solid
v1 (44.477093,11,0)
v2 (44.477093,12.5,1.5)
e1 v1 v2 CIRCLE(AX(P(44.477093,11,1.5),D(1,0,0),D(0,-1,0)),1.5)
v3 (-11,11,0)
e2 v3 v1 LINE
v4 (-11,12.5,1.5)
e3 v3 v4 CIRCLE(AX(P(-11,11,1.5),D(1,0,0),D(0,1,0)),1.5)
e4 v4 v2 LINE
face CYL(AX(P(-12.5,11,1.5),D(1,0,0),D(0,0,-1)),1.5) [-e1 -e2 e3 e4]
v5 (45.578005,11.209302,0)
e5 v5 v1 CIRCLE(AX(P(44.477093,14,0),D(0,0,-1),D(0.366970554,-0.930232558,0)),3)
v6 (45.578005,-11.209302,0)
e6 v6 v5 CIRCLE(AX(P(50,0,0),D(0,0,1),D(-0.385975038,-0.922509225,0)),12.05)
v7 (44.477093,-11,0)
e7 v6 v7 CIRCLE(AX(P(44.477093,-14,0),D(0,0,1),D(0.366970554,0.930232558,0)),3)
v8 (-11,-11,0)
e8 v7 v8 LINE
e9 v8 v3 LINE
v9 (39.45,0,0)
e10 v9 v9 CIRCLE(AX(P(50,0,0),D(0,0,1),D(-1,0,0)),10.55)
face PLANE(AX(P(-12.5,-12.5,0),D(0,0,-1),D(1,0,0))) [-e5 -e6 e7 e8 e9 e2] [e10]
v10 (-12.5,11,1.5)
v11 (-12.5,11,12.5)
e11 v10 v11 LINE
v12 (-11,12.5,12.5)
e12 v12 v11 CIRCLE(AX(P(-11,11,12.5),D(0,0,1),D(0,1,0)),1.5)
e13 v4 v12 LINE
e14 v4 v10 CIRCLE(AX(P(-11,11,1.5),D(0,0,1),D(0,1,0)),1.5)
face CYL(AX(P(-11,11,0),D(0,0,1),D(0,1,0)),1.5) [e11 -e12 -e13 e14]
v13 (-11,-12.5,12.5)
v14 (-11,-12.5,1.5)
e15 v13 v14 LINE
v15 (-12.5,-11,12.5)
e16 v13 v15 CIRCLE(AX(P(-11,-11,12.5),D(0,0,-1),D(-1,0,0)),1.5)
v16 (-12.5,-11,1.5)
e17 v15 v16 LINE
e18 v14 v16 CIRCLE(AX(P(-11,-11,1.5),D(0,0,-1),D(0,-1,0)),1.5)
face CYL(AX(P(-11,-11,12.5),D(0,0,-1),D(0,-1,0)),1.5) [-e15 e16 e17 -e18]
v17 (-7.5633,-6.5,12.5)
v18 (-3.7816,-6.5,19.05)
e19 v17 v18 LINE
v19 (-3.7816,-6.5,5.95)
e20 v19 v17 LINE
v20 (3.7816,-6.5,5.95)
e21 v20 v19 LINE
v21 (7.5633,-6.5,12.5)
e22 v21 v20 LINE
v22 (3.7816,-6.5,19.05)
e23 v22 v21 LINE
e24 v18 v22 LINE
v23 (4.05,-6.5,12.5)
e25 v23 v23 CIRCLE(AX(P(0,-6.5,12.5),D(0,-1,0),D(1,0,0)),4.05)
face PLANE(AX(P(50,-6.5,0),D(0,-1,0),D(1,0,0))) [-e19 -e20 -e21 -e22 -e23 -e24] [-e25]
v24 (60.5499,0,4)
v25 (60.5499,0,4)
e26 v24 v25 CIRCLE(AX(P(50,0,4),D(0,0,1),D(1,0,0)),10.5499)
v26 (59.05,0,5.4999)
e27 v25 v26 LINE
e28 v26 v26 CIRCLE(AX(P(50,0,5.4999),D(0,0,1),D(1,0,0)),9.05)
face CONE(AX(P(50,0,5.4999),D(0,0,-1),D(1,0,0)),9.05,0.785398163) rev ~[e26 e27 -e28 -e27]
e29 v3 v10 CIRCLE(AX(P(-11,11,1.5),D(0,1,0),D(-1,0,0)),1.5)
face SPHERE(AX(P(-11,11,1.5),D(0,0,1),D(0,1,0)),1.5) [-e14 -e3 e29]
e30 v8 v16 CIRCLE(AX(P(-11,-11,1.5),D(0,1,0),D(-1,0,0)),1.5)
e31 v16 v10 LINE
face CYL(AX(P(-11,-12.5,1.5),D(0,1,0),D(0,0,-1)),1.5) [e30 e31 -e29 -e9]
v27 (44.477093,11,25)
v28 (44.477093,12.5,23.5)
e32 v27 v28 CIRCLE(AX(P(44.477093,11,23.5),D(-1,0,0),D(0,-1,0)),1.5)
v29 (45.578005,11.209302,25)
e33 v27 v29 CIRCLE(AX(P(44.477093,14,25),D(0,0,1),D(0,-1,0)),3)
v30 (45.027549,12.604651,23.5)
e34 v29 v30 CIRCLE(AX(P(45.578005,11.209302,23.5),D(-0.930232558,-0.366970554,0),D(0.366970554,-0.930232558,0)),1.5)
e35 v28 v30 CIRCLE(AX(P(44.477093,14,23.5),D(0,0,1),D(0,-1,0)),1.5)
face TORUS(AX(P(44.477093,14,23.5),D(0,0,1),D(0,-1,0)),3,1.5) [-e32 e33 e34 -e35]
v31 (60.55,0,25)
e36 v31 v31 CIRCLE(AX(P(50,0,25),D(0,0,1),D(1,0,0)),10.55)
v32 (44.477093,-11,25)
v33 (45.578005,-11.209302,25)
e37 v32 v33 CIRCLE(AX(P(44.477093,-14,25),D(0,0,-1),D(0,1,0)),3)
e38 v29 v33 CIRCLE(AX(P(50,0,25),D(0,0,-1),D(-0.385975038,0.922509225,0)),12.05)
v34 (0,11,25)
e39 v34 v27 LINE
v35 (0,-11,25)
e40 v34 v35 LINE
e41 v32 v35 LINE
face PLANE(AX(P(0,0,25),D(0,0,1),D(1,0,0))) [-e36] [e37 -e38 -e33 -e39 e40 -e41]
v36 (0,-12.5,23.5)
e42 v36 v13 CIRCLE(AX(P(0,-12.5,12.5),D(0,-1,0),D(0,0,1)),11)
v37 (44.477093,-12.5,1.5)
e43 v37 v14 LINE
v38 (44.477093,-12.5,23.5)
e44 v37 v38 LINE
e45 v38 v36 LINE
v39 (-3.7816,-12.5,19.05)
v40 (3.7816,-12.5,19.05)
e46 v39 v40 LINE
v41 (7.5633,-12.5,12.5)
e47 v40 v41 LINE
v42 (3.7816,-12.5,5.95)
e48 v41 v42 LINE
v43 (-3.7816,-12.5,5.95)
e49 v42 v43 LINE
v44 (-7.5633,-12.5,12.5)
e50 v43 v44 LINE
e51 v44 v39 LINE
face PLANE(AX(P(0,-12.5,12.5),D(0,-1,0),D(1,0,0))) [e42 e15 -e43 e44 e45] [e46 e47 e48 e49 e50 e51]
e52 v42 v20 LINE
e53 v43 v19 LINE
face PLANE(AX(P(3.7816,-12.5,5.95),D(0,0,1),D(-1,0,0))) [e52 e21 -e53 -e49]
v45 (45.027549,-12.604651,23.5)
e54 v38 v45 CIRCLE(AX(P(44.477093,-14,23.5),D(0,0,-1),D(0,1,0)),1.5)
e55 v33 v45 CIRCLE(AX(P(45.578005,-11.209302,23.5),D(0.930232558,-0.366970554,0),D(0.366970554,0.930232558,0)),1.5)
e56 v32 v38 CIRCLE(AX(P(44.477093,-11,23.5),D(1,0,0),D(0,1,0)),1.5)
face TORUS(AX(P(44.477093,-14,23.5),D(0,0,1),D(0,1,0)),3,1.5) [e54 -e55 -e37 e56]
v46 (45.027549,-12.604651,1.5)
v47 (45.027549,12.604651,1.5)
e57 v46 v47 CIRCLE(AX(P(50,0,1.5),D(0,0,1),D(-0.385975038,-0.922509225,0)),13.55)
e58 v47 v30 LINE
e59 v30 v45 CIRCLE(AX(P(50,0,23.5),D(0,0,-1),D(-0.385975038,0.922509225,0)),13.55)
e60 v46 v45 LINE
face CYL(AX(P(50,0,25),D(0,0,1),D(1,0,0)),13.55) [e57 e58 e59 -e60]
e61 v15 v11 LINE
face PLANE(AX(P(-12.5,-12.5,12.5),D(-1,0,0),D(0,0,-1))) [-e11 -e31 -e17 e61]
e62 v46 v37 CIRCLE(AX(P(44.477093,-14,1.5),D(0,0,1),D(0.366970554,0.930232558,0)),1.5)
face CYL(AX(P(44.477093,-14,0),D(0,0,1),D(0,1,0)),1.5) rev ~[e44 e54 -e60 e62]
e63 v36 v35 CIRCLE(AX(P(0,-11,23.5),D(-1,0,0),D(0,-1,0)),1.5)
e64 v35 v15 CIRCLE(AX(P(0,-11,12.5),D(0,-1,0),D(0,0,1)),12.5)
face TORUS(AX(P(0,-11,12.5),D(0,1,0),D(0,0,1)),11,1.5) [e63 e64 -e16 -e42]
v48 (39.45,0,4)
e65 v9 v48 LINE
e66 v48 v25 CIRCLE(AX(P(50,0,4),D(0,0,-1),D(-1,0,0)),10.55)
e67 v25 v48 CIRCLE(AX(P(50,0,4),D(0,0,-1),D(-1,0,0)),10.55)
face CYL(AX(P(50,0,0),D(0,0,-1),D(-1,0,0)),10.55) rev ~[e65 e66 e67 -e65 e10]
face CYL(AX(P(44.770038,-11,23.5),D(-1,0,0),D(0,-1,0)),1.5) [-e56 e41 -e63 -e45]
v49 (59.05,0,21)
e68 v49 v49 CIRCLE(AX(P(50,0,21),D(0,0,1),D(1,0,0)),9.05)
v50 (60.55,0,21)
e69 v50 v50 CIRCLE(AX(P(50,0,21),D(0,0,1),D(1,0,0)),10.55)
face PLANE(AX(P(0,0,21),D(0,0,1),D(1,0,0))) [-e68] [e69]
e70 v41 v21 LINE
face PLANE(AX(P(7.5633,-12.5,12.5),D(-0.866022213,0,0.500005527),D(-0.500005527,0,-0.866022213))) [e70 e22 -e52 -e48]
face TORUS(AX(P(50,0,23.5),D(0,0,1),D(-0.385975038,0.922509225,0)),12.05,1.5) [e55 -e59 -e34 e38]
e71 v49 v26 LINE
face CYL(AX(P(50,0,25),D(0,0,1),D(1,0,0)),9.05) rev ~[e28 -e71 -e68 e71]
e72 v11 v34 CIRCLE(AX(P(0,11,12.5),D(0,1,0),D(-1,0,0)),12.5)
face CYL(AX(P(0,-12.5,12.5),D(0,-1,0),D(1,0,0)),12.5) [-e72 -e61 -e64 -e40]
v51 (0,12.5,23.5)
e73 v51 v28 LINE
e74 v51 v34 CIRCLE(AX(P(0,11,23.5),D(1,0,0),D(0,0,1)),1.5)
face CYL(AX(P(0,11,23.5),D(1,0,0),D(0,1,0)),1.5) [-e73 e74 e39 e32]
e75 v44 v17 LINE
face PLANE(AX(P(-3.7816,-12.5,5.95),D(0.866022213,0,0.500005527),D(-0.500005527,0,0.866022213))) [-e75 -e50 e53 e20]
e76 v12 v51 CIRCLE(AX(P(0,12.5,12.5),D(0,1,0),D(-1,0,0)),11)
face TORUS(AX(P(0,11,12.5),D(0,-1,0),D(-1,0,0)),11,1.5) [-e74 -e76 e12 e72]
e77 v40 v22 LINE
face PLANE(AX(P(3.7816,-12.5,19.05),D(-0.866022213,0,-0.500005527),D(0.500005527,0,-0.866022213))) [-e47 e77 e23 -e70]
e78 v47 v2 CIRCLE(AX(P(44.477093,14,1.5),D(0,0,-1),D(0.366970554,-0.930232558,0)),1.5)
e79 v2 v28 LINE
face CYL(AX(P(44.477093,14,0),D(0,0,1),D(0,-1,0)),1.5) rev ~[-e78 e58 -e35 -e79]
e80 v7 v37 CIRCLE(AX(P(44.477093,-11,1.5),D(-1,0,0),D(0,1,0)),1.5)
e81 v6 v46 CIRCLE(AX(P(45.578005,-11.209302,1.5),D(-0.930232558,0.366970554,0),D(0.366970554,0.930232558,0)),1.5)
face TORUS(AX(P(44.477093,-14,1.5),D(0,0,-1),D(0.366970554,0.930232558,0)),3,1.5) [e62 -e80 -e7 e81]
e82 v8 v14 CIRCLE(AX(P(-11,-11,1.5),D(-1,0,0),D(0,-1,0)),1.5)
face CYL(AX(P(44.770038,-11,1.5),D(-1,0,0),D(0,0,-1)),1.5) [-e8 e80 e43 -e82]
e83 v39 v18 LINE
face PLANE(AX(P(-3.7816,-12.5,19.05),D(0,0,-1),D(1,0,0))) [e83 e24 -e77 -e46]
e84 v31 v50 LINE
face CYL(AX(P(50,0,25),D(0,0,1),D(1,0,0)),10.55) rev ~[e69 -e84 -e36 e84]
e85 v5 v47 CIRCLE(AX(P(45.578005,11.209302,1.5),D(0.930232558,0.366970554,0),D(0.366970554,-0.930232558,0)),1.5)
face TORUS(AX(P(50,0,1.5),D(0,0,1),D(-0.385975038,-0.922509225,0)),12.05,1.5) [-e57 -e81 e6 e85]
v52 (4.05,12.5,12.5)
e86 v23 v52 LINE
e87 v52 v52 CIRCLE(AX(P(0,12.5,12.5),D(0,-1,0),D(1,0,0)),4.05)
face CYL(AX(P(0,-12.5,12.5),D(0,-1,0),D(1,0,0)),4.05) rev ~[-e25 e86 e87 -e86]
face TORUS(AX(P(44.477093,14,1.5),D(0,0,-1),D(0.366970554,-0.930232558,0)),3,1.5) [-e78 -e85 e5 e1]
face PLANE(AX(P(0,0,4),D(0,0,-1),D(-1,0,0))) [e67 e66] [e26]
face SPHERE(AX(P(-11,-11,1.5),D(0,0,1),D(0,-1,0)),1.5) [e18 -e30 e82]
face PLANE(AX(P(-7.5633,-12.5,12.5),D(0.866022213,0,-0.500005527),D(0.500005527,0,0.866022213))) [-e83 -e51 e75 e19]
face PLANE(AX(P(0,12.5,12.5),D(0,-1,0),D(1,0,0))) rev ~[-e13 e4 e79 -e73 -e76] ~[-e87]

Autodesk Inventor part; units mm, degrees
ref_plane "YZ Plane" through (0, 0, 0) normal (1, 0, 0) x (0, 1, 0)
ref_plane "XZ Plane" through (0, 0, 0) normal (0, 1, 0) x (-1, 0, 0)
ref_plane "XY Plane" through (0, 0, 0) normal (0, 0, 1) x (1, 0, 0)
sketch "Sketch1" plane through (0, 0, 0) normal (0, 0, 1) x (1, 0, 0)
  line L0 (0, 0) -> (0, 12.5)
  line L1 (0, 12.5) -> (50, 12.5)
  arc A0 (50, -12.5) -> (50, 12.5) centre (50, 0) ccw
  line L2 (50, -12.5) -> (0, -12.5)
  line L3 (0, -12.5) -> (0, 0)
  dimension "d0" = 12.5
  dimension "d2" = 50
extrude "Extrusion1" add sketch "Sketch1" along normal blind 25
sketch "Sketch2" plane through (0, -12.5, 0) normal (0, -1, 0) x (1, 0, 0)
  line L0 (0, 0) -> (0, 25) projected
  circle A0 centre (0, 12.5) radius 12.5
extrude "Extrusion2" add sketch "Sketch2" against normal up to surface (25 mm away)
sketch "Sketch3" plane through (50, -12.5, 0) normal (0, -1, 0) x (1, 0, 0)
  arc A0 (-50, 25) -> (-50, 0) centre (-50, 12.5) ccw projected
  circle A1 centre (-50, 12.5) radius 4.05
  dimension "d7" = 8.1
extrude "Extrusion3" cut sketch "Sketch3" against normal through all
sketch "Sketch4" plane through (0, 0, 25) normal (0, 0, 1) x (1, 0, 0)
  arc A0 (50, -12.5) -> (50, 12.5) centre (50, 0) ccw projected
  circle A1 centre (50, 0) radius 9.05
  point P0 (0, 0)
  dimension "d11" = 18.1
extrude "Extrusion4" cut sketch "Sketch4" against normal through all
sketch "Sketch16" plane through (50, -12.5, 0) normal (0, -1, 0) x (1, 0, 0)
  circle A0 centre (-50, 12.5) radius 4.05 projected
  arc A1 (-50, 25) -> (-50, 0) centre (-50, 12.5) ccw projected
  line L0 (-57.5633, 12.5) -> (-53.7816, 19.05)
  line L1 (-53.7816, 19.05) -> (-46.2184, 19.05)
  line L2 (-46.2184, 19.05) -> (-42.4367, 12.5)
  line L3 (-42.4367, 12.5) -> (-46.2184, 5.95)
  line L4 (-46.2184, 5.95) -> (-53.7816, 5.95)
  line L5 (-53.7816, 5.95) -> (-57.5633, 12.5)
  dimension "d74" = 13.1
extrude "Extrusion14" cut sketch "Sketch16" against normal blind 6
sketch "Sketch17" plane through (0, 0, 25) normal (0, 0, 1) x (1, 0, 0)
  circle A0 centre (50, 0) radius 9.05 projected
  arc A1 (50, -12.5) -> (50, 12.5) centre (50, 0) ccw projected
  circle A2 centre (50, 0) radius 10.55
  point P0 (0, 0)
  dimension "d78" = 21.1
extrude "Extrusion15" cut sketch "Sketch17" against normal blind 4
sketch "Sketch19" plane through (0, 0, 0) normal (0, 0, -1) x (-1, 0, 0)
  circle A0 centre (-50, 0) radius 9.05 projected
  circle A1 centre (-50, 0) radius 10.55 projected
  point P0 (0, 0)
extrude "Extrusion16" cut sketch "Sketch19" against normal blind 4
chamfer "Chamfer2" distance 1.5 angle 45 1 edges at (40.95, 0, 4)
sketch "Sketch20" plane through (0, 0, 25) normal (0, 0, 1) x (1, 0, 0)
  circle A0 centre (50, 0) radius 10.55 projected
  arc A1 (50, -12.5) -> (50, 12.5) centre (50, 0) ccw projected
  circle A2 centre (50, 0) radius 13.55
  point P0 (0, 0)
  dimension "d87" = 3
extrude "Extrusion17" add sketch "Sketch20" against normal up to surface (25 mm away)
sketch "Sketch21" plane through (0, -12.5, 12.5) normal (0, -1, 0) x (1, 0, 0)
  arc A0 (0, 12.5) -> (0, -12.5) centre (0, 0) ccw projected
  line L0 (44.77, -12.5) -> (0, -12.5) projected
  line L1 (3.7816, -6.55) -> (-3.7816, -6.55) projected
  line L2 (-12.5, 0) -> (-12.5, -12.5)
  line L3 (-12.5, -12.5) -> (0, -12.5)
extrude "Extrusion18" add sketch "Sketch21" against normal up to surface (25 mm away)
fillet "Fillet1" radius 1.5 11 edges at (22.385, 12.5, 25) (22.385, -12.5, 25) (63.55, 0, 25) (-8.8388, 12.5, 21.3388) (16.135, 12.5, 0) (-8.8388, -12.5, 21.3388) (16.135, -12.5, 0) (44.77, 12.5, 12.5) (44.77, -12.5, 12.5) (63.55, 0, 0) (-12.5, 0, 0)
properties part number "hub center"
